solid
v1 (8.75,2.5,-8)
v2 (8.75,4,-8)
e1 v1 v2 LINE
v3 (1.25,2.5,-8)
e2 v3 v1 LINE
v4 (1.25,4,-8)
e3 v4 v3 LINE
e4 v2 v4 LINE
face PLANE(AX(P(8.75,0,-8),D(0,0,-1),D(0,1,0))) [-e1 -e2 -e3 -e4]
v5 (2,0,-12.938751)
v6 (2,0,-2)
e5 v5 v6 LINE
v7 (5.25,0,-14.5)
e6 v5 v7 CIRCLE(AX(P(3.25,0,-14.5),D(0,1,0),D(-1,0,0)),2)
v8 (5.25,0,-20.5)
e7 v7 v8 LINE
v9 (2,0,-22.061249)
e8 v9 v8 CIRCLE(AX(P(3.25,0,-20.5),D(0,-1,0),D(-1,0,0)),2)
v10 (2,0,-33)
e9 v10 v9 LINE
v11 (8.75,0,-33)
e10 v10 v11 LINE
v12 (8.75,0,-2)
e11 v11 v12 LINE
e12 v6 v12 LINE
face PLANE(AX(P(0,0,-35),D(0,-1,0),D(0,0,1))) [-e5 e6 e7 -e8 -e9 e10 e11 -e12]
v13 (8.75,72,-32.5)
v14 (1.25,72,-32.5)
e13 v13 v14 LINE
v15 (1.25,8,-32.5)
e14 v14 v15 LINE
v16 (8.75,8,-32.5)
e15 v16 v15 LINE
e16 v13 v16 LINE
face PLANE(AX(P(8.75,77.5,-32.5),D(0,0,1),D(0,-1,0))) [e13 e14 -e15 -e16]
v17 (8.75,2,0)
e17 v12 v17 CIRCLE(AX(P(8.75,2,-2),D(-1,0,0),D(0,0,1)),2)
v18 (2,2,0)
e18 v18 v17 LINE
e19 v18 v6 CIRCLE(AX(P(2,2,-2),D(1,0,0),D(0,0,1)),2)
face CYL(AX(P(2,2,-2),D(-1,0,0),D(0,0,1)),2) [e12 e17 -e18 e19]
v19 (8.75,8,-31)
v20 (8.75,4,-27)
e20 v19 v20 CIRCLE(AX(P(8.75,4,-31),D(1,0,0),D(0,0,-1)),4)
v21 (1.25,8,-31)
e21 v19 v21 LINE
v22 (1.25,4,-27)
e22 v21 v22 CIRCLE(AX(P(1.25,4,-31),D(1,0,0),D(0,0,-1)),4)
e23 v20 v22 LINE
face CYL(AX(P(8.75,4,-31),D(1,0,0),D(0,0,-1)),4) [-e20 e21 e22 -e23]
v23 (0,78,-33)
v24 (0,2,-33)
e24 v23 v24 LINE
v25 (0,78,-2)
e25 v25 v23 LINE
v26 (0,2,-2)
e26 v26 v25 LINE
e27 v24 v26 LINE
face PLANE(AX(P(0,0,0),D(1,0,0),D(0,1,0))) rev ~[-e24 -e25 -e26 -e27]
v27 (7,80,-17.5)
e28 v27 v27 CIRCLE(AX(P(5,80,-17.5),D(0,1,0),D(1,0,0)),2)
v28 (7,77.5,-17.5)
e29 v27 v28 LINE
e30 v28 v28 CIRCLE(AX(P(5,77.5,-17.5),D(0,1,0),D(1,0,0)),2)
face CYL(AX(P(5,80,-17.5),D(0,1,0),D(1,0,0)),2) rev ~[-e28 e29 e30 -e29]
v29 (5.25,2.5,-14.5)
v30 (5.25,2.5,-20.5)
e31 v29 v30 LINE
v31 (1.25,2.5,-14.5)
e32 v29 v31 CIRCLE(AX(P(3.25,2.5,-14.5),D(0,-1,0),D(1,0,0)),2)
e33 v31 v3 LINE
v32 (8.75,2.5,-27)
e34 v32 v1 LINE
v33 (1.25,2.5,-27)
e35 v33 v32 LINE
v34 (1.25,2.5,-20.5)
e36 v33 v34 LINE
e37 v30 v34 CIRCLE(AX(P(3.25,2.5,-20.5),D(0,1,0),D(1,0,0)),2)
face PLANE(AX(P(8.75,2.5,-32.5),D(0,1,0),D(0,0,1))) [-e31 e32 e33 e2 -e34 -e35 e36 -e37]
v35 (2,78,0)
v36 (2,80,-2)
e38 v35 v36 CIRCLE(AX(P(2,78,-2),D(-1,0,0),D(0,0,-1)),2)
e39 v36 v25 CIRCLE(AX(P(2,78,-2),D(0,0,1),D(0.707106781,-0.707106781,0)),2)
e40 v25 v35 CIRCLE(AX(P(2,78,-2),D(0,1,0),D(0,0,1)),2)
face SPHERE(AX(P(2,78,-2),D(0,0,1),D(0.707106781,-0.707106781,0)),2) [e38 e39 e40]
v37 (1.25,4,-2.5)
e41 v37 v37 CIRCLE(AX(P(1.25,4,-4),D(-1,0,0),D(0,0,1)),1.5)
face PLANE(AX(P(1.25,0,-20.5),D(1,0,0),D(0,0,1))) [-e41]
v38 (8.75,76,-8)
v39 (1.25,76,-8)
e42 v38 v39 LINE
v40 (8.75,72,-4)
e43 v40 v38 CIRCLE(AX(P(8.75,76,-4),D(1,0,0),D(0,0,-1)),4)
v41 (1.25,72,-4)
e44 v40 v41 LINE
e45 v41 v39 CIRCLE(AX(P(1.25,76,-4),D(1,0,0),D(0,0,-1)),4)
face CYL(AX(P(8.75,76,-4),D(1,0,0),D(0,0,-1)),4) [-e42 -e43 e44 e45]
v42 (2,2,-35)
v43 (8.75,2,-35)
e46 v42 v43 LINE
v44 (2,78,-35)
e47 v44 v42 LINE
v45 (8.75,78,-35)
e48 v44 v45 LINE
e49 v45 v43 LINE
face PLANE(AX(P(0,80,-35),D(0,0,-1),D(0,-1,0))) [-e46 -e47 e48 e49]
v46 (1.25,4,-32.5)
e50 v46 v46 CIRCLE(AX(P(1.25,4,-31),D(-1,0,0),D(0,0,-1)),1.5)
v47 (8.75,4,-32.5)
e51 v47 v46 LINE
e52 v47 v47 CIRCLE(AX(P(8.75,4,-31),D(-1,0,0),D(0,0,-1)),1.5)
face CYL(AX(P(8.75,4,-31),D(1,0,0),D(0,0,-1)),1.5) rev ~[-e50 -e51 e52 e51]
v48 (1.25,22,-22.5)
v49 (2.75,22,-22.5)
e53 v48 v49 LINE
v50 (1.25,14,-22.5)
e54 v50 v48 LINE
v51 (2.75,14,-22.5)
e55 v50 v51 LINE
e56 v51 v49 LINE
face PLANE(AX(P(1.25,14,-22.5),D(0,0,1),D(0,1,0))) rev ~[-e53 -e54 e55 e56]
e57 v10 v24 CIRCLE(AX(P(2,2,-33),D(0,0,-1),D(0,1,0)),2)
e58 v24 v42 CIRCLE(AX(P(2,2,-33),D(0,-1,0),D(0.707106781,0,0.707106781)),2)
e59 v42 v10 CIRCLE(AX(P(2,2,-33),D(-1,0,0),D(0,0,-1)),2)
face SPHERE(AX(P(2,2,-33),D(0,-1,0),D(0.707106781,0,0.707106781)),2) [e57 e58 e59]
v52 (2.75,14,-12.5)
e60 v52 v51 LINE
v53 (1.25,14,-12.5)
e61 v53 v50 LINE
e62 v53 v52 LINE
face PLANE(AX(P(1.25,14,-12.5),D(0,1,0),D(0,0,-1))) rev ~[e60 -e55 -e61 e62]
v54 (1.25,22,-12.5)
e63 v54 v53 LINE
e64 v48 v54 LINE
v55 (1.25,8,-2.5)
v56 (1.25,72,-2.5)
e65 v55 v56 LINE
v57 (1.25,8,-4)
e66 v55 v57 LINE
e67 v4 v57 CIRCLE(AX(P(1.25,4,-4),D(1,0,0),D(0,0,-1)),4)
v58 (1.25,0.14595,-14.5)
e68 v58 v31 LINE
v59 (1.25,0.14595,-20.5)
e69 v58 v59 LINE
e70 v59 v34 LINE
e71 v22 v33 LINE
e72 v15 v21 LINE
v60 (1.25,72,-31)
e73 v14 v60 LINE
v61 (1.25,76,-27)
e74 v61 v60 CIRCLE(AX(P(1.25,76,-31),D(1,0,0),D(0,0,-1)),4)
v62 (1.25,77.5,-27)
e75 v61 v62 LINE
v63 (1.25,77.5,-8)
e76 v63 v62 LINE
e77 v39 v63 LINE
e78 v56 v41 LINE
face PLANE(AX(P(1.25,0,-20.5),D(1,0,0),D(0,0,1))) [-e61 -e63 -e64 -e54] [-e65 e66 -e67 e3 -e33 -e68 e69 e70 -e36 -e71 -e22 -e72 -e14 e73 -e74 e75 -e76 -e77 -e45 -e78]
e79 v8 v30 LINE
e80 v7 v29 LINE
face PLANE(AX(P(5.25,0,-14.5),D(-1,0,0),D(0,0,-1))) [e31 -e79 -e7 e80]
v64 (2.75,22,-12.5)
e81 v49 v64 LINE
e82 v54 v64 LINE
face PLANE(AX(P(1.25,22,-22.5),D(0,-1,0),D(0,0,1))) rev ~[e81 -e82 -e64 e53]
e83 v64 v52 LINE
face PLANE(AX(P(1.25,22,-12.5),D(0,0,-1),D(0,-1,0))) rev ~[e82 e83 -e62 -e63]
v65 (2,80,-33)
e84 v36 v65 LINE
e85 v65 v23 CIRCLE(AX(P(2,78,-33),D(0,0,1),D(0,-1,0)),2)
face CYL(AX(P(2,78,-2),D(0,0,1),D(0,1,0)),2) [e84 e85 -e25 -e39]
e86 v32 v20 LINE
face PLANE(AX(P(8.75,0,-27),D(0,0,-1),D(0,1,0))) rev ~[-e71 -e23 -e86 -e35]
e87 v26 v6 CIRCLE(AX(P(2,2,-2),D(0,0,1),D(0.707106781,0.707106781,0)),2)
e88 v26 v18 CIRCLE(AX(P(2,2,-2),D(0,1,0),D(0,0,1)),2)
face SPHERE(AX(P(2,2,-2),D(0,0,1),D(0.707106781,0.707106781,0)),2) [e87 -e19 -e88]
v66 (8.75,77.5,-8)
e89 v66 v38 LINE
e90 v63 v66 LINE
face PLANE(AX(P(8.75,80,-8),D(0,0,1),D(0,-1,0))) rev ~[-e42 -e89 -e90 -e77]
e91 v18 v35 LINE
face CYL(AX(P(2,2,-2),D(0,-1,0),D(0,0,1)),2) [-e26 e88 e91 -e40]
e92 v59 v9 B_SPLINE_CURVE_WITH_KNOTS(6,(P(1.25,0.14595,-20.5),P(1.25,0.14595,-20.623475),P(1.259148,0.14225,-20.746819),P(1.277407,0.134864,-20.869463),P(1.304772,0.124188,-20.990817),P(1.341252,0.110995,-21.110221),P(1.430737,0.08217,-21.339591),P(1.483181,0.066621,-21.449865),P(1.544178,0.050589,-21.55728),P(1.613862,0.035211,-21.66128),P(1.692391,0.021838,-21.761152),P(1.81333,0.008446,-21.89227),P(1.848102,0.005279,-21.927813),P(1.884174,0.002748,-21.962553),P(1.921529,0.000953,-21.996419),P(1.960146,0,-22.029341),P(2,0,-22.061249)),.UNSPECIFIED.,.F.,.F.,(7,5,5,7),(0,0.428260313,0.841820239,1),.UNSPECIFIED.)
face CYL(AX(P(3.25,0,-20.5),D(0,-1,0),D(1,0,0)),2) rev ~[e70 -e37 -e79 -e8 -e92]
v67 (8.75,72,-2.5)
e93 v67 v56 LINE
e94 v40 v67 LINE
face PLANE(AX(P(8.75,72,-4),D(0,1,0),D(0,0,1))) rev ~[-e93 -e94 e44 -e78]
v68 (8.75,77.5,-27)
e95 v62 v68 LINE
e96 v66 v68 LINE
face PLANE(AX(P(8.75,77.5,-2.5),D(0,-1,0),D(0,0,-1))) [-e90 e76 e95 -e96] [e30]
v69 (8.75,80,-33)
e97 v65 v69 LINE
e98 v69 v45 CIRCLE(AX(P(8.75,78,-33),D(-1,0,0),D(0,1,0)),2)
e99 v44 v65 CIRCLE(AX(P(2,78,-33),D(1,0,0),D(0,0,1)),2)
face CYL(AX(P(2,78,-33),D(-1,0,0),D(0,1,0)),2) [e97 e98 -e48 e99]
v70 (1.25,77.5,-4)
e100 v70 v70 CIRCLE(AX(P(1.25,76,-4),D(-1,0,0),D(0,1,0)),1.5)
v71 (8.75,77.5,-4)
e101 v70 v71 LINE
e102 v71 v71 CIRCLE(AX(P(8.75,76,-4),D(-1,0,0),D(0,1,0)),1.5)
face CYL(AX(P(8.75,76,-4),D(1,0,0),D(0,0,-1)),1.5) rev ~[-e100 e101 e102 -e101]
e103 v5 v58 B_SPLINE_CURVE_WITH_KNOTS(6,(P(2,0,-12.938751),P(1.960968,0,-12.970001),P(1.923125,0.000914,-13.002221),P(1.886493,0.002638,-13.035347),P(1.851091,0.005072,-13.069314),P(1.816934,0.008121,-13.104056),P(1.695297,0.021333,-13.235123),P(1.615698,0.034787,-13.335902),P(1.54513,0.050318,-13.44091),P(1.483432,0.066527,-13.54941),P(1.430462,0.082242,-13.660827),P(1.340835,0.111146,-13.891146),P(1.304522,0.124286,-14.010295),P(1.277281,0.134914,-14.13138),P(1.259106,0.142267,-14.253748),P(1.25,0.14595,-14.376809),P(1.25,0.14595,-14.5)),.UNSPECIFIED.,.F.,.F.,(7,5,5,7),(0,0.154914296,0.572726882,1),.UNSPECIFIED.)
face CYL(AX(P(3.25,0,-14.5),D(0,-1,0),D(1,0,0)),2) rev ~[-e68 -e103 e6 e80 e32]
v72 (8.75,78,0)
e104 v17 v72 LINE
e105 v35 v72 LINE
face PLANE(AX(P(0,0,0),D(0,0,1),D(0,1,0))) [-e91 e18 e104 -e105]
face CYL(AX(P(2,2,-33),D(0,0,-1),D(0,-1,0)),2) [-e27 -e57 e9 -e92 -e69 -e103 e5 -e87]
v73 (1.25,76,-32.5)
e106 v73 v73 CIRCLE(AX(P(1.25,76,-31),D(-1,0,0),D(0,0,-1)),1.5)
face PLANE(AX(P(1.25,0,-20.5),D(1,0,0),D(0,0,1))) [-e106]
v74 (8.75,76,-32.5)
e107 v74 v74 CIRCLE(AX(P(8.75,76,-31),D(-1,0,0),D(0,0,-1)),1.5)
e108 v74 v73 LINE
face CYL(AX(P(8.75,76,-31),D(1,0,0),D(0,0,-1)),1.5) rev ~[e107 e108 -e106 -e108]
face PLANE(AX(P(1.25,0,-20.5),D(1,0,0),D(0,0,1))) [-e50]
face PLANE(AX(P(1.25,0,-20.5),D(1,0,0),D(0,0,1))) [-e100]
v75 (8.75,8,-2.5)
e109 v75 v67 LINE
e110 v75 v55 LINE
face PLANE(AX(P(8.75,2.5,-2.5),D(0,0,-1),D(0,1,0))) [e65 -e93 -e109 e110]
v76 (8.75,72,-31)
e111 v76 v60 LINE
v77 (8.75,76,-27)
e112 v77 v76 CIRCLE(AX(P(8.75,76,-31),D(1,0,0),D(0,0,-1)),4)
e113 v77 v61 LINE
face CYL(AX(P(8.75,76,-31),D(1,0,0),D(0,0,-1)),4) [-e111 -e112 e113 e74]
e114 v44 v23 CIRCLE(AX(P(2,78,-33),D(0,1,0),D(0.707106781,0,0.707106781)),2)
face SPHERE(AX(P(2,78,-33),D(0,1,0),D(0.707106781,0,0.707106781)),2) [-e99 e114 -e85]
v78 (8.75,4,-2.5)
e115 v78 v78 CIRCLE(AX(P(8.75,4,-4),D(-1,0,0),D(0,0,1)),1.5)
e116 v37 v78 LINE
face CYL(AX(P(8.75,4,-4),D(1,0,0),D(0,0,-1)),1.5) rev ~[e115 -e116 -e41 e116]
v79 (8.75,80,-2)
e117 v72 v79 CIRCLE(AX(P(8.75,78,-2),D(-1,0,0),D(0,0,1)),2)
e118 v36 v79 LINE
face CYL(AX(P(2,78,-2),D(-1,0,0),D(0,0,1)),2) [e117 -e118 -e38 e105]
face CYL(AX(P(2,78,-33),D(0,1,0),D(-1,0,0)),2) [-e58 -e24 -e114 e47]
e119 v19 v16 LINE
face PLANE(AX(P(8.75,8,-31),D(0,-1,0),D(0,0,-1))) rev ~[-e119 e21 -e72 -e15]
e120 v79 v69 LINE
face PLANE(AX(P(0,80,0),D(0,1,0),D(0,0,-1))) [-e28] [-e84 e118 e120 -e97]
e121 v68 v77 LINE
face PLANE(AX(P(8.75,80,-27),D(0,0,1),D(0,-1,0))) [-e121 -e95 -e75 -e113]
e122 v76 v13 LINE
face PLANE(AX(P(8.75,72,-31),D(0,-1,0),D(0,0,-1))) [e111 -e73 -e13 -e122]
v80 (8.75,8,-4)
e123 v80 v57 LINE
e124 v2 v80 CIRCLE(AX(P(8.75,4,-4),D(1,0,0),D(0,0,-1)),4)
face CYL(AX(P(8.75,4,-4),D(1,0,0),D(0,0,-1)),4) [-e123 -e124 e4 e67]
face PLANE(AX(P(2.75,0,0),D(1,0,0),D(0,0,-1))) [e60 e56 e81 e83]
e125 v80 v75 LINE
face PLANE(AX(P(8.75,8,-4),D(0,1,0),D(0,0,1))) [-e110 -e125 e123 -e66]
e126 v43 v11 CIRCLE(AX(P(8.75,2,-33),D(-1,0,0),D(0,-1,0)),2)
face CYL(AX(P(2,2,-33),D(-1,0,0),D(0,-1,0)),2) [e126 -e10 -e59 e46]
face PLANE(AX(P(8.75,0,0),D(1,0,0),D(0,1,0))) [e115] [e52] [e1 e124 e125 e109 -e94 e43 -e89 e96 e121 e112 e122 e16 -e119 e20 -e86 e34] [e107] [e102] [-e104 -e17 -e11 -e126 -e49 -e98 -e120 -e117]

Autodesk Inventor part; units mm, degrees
ref_plane "YZ Plane" through (0, 0, 0) normal (1, 0, 0) x (0, 1, 0)
ref_plane "XZ Plane" through (0, 0, 0) normal (0, 1, 0) x (-1, 0, 0)
ref_plane "XY Plane" through (0, 0, 0) normal (0, 0, 1) x (1, 0, 0)
sketch "스케치1" plane through (0, 0, 0) normal (1, 0, 0) x (0, 1, 0)
  line L0 (0, 0) -> (80, 0)
  line L1 (80, 0) -> (80, -35)
  line L2 (80, -35) -> (0, -35)
  line L3 (0, -35) -> (0, 0)
  dimension "d0" = 35
  dimension "d1" = 80
extrude "돌출1" add sketch "스케치1" along normal blind 8.75
sketch "스케치2" plane through (8.75, 0, 0) normal (1, 0, 0) x (0, 0, -1)
  line L0 (35, 80) -> (0, 80) projected
  line L1 (35, 0) -> (35, 80) projected
  line L2 (0, 80) -> (0, 0) projected
  line L3 (0, 0) -> (35, 0) projected
  line L4 (2.5, 77.5) -> (32.5, 77.5)
  line L5 (32.5, 77.5) -> (32.5, 2.5)
  line L6 (32.5, 2.5) -> (2.5, 2.5)
  line L7 (2.5, 2.5) -> (2.5, 77.5)
  dimension "d4" = 2.5
extrude "돌출2" cut sketch "스케치2" against normal blind 7.5 contours L4 L5 L6 L7
sketch "스케치3" plane through (0, 0, -35) normal (0, -1, 0) x (1, 0, 0)
  line L0 (1.25, 22.5) -> (5.25, 22.5)
  line L1 (5.25, 22.5) -> (5.25, 12.5)
  line L2 (5.25, 12.5) -> (1.25, 12.5)
  line L3 (1.25, 12.5) -> (1.25, 22.5)
  line L4 (1.25, 2.5) -> (1.25, 32.5) projected
  line L5 (0, 0) -> (8.75, 0) projected
  line L6 (0, 35) -> (8.75, 35) projected
  circle A0 centre (3.25, 14.5) radius 2
  circle A1 centre (3.25, 20.5) radius 2
  point P0 (1.25, 14.5)
  point P1 (5.25, 14.5)
  point P2 (5.25, 20.5)
  point P3 (1.25, 20.5)
  dimension "d7" = 4
  dimension "d8" = 10
  dimension "d9" = 12.5
  dimension "d10" = 35
extrude "돌출3" cut sketch "스케치3" against normal blind 2.5 contours A1 | A1 L1 A0 L3 | A0
sketch "스케치6" plane through (1.25, 0, 0) normal (1, 0, 0) x (0, 0, -1)
  line L0 (12.5, 14) -> (22.5, 14)
  line L1 (22.5, 14) -> (22.5, 22)
  line L2 (22.5, 22) -> (12.5, 22)
  line L3 (12.5, 22) -> (12.5, 14)
  line L4 (14.5, 0) -> (12.5, 0) projected
  line L5 (22.5, 0) -> (20.5, 0) projected
  line L6 (20.5, 0) -> (14.5, 0) projected
  point P0 (0, 0)
  dimension "d22" = 14
  dimension "d23" = 8
extrude "돌출6" add sketch "스케치6" along normal blind 1.5
sketch "스케치4" plane through (8.75, 0, 0) normal (1, 0, 0) x (0, 0, -1)
  line L0 (35, 0) -> (27, 0)
  line L1 (27, 0) -> (27, 8)
  line L2 (27, 8) -> (35, 8)
  line L3 (35, 8) -> (35, 0)
  line L4 (0, 0) -> (8, 0)
  line L5 (8, 0) -> (8, 8)
  line L6 (8, 8) -> (0, 8)
  line L7 (0, 8) -> (0, 0)
  line L8 (0, 80) -> (8, 80)
  line L9 (8, 80) -> (8, 72)
  line L10 (8, 72) -> (0, 72)
  line L11 (0, 72) -> (0, 80)
  line L12 (35, 0) -> (35, 80) projected
  line L13 (35, 80) -> (27, 80)
  line L14 (27, 80) -> (27, 72)
  line L15 (27, 72) -> (35, 72)
  line L16 (35, 72) -> (35, 80)
  circle A0 centre (4, 76) radius 4
  circle A1 centre (31, 76) radius 4
  circle A2 centre (31, 4) radius 4
  circle A3 centre (4, 4) radius 4
  circle A4 centre (4, 4) radius 1.5
  circle A5 centre (31, 4) radius 1.5
  circle A6 centre (31, 76) radius 1.5
  circle A7 centre (4, 76) radius 1.5
  point P0 (8, 4)
  point P1 (4, 8)
  point P2 (31, 8)
  point P3 (27, 4)
  point P4 (4, 72)
  point P5 (8, 76)
  point P6 (27, 76)
  point P7 (31, 72)
  dimension "d14" = 8
  dimension "d16" = 3
extrude "돌출4" add sketch "스케치4" against normal up to next contours L0 A2 L3 | L0 L1 A2 | A2 | A2 L2 L3 | L7 A3 L4 | A3 L5 L4 | A3 | L7 L6 A3 | L8 A0 L11 | L8 L9 A0 | A0 | A0 L10 L11 | L15 A1 L12 | A1 L13 L12 | A1 | A1 L14 L13
sketch "스케치7" plane through (0, 80, 0) normal (0, 1, 0) x (1, 0, 0)
  circle A0 centre (5, 17.5) radius 2
  line L0 (0, 35) -> (8.75, 35) projected
  line L1 (0, 0) -> (8.75, 0) projected
  line L2 (0, 35) -> (0, 0) projected
  point P0 (-3.75, 35)
  point P1 (0, 27)
  dimension "d26" = 4
  dimension "d27" = 35
  dimension "d28" = 17.5
  dimension "d29" = 5
extrude "돌출7" cut sketch "스케치7" against normal blind 2.5
fillet "모깎기2" radius 2 8 edges at (4.375, 80, 0) (0, 80, -17.5) (0, 40, -35) (4.375, 0, -35) (0, 0, -17.5) (0, 40, 0) (4.375, 0, 0) (4.375, 80, -35)
equation "\"d9\" = -0.5 * d8 + 0.5 * d10"
equation "\"d28\" = 0.5 * d27"
properties part number "111"
